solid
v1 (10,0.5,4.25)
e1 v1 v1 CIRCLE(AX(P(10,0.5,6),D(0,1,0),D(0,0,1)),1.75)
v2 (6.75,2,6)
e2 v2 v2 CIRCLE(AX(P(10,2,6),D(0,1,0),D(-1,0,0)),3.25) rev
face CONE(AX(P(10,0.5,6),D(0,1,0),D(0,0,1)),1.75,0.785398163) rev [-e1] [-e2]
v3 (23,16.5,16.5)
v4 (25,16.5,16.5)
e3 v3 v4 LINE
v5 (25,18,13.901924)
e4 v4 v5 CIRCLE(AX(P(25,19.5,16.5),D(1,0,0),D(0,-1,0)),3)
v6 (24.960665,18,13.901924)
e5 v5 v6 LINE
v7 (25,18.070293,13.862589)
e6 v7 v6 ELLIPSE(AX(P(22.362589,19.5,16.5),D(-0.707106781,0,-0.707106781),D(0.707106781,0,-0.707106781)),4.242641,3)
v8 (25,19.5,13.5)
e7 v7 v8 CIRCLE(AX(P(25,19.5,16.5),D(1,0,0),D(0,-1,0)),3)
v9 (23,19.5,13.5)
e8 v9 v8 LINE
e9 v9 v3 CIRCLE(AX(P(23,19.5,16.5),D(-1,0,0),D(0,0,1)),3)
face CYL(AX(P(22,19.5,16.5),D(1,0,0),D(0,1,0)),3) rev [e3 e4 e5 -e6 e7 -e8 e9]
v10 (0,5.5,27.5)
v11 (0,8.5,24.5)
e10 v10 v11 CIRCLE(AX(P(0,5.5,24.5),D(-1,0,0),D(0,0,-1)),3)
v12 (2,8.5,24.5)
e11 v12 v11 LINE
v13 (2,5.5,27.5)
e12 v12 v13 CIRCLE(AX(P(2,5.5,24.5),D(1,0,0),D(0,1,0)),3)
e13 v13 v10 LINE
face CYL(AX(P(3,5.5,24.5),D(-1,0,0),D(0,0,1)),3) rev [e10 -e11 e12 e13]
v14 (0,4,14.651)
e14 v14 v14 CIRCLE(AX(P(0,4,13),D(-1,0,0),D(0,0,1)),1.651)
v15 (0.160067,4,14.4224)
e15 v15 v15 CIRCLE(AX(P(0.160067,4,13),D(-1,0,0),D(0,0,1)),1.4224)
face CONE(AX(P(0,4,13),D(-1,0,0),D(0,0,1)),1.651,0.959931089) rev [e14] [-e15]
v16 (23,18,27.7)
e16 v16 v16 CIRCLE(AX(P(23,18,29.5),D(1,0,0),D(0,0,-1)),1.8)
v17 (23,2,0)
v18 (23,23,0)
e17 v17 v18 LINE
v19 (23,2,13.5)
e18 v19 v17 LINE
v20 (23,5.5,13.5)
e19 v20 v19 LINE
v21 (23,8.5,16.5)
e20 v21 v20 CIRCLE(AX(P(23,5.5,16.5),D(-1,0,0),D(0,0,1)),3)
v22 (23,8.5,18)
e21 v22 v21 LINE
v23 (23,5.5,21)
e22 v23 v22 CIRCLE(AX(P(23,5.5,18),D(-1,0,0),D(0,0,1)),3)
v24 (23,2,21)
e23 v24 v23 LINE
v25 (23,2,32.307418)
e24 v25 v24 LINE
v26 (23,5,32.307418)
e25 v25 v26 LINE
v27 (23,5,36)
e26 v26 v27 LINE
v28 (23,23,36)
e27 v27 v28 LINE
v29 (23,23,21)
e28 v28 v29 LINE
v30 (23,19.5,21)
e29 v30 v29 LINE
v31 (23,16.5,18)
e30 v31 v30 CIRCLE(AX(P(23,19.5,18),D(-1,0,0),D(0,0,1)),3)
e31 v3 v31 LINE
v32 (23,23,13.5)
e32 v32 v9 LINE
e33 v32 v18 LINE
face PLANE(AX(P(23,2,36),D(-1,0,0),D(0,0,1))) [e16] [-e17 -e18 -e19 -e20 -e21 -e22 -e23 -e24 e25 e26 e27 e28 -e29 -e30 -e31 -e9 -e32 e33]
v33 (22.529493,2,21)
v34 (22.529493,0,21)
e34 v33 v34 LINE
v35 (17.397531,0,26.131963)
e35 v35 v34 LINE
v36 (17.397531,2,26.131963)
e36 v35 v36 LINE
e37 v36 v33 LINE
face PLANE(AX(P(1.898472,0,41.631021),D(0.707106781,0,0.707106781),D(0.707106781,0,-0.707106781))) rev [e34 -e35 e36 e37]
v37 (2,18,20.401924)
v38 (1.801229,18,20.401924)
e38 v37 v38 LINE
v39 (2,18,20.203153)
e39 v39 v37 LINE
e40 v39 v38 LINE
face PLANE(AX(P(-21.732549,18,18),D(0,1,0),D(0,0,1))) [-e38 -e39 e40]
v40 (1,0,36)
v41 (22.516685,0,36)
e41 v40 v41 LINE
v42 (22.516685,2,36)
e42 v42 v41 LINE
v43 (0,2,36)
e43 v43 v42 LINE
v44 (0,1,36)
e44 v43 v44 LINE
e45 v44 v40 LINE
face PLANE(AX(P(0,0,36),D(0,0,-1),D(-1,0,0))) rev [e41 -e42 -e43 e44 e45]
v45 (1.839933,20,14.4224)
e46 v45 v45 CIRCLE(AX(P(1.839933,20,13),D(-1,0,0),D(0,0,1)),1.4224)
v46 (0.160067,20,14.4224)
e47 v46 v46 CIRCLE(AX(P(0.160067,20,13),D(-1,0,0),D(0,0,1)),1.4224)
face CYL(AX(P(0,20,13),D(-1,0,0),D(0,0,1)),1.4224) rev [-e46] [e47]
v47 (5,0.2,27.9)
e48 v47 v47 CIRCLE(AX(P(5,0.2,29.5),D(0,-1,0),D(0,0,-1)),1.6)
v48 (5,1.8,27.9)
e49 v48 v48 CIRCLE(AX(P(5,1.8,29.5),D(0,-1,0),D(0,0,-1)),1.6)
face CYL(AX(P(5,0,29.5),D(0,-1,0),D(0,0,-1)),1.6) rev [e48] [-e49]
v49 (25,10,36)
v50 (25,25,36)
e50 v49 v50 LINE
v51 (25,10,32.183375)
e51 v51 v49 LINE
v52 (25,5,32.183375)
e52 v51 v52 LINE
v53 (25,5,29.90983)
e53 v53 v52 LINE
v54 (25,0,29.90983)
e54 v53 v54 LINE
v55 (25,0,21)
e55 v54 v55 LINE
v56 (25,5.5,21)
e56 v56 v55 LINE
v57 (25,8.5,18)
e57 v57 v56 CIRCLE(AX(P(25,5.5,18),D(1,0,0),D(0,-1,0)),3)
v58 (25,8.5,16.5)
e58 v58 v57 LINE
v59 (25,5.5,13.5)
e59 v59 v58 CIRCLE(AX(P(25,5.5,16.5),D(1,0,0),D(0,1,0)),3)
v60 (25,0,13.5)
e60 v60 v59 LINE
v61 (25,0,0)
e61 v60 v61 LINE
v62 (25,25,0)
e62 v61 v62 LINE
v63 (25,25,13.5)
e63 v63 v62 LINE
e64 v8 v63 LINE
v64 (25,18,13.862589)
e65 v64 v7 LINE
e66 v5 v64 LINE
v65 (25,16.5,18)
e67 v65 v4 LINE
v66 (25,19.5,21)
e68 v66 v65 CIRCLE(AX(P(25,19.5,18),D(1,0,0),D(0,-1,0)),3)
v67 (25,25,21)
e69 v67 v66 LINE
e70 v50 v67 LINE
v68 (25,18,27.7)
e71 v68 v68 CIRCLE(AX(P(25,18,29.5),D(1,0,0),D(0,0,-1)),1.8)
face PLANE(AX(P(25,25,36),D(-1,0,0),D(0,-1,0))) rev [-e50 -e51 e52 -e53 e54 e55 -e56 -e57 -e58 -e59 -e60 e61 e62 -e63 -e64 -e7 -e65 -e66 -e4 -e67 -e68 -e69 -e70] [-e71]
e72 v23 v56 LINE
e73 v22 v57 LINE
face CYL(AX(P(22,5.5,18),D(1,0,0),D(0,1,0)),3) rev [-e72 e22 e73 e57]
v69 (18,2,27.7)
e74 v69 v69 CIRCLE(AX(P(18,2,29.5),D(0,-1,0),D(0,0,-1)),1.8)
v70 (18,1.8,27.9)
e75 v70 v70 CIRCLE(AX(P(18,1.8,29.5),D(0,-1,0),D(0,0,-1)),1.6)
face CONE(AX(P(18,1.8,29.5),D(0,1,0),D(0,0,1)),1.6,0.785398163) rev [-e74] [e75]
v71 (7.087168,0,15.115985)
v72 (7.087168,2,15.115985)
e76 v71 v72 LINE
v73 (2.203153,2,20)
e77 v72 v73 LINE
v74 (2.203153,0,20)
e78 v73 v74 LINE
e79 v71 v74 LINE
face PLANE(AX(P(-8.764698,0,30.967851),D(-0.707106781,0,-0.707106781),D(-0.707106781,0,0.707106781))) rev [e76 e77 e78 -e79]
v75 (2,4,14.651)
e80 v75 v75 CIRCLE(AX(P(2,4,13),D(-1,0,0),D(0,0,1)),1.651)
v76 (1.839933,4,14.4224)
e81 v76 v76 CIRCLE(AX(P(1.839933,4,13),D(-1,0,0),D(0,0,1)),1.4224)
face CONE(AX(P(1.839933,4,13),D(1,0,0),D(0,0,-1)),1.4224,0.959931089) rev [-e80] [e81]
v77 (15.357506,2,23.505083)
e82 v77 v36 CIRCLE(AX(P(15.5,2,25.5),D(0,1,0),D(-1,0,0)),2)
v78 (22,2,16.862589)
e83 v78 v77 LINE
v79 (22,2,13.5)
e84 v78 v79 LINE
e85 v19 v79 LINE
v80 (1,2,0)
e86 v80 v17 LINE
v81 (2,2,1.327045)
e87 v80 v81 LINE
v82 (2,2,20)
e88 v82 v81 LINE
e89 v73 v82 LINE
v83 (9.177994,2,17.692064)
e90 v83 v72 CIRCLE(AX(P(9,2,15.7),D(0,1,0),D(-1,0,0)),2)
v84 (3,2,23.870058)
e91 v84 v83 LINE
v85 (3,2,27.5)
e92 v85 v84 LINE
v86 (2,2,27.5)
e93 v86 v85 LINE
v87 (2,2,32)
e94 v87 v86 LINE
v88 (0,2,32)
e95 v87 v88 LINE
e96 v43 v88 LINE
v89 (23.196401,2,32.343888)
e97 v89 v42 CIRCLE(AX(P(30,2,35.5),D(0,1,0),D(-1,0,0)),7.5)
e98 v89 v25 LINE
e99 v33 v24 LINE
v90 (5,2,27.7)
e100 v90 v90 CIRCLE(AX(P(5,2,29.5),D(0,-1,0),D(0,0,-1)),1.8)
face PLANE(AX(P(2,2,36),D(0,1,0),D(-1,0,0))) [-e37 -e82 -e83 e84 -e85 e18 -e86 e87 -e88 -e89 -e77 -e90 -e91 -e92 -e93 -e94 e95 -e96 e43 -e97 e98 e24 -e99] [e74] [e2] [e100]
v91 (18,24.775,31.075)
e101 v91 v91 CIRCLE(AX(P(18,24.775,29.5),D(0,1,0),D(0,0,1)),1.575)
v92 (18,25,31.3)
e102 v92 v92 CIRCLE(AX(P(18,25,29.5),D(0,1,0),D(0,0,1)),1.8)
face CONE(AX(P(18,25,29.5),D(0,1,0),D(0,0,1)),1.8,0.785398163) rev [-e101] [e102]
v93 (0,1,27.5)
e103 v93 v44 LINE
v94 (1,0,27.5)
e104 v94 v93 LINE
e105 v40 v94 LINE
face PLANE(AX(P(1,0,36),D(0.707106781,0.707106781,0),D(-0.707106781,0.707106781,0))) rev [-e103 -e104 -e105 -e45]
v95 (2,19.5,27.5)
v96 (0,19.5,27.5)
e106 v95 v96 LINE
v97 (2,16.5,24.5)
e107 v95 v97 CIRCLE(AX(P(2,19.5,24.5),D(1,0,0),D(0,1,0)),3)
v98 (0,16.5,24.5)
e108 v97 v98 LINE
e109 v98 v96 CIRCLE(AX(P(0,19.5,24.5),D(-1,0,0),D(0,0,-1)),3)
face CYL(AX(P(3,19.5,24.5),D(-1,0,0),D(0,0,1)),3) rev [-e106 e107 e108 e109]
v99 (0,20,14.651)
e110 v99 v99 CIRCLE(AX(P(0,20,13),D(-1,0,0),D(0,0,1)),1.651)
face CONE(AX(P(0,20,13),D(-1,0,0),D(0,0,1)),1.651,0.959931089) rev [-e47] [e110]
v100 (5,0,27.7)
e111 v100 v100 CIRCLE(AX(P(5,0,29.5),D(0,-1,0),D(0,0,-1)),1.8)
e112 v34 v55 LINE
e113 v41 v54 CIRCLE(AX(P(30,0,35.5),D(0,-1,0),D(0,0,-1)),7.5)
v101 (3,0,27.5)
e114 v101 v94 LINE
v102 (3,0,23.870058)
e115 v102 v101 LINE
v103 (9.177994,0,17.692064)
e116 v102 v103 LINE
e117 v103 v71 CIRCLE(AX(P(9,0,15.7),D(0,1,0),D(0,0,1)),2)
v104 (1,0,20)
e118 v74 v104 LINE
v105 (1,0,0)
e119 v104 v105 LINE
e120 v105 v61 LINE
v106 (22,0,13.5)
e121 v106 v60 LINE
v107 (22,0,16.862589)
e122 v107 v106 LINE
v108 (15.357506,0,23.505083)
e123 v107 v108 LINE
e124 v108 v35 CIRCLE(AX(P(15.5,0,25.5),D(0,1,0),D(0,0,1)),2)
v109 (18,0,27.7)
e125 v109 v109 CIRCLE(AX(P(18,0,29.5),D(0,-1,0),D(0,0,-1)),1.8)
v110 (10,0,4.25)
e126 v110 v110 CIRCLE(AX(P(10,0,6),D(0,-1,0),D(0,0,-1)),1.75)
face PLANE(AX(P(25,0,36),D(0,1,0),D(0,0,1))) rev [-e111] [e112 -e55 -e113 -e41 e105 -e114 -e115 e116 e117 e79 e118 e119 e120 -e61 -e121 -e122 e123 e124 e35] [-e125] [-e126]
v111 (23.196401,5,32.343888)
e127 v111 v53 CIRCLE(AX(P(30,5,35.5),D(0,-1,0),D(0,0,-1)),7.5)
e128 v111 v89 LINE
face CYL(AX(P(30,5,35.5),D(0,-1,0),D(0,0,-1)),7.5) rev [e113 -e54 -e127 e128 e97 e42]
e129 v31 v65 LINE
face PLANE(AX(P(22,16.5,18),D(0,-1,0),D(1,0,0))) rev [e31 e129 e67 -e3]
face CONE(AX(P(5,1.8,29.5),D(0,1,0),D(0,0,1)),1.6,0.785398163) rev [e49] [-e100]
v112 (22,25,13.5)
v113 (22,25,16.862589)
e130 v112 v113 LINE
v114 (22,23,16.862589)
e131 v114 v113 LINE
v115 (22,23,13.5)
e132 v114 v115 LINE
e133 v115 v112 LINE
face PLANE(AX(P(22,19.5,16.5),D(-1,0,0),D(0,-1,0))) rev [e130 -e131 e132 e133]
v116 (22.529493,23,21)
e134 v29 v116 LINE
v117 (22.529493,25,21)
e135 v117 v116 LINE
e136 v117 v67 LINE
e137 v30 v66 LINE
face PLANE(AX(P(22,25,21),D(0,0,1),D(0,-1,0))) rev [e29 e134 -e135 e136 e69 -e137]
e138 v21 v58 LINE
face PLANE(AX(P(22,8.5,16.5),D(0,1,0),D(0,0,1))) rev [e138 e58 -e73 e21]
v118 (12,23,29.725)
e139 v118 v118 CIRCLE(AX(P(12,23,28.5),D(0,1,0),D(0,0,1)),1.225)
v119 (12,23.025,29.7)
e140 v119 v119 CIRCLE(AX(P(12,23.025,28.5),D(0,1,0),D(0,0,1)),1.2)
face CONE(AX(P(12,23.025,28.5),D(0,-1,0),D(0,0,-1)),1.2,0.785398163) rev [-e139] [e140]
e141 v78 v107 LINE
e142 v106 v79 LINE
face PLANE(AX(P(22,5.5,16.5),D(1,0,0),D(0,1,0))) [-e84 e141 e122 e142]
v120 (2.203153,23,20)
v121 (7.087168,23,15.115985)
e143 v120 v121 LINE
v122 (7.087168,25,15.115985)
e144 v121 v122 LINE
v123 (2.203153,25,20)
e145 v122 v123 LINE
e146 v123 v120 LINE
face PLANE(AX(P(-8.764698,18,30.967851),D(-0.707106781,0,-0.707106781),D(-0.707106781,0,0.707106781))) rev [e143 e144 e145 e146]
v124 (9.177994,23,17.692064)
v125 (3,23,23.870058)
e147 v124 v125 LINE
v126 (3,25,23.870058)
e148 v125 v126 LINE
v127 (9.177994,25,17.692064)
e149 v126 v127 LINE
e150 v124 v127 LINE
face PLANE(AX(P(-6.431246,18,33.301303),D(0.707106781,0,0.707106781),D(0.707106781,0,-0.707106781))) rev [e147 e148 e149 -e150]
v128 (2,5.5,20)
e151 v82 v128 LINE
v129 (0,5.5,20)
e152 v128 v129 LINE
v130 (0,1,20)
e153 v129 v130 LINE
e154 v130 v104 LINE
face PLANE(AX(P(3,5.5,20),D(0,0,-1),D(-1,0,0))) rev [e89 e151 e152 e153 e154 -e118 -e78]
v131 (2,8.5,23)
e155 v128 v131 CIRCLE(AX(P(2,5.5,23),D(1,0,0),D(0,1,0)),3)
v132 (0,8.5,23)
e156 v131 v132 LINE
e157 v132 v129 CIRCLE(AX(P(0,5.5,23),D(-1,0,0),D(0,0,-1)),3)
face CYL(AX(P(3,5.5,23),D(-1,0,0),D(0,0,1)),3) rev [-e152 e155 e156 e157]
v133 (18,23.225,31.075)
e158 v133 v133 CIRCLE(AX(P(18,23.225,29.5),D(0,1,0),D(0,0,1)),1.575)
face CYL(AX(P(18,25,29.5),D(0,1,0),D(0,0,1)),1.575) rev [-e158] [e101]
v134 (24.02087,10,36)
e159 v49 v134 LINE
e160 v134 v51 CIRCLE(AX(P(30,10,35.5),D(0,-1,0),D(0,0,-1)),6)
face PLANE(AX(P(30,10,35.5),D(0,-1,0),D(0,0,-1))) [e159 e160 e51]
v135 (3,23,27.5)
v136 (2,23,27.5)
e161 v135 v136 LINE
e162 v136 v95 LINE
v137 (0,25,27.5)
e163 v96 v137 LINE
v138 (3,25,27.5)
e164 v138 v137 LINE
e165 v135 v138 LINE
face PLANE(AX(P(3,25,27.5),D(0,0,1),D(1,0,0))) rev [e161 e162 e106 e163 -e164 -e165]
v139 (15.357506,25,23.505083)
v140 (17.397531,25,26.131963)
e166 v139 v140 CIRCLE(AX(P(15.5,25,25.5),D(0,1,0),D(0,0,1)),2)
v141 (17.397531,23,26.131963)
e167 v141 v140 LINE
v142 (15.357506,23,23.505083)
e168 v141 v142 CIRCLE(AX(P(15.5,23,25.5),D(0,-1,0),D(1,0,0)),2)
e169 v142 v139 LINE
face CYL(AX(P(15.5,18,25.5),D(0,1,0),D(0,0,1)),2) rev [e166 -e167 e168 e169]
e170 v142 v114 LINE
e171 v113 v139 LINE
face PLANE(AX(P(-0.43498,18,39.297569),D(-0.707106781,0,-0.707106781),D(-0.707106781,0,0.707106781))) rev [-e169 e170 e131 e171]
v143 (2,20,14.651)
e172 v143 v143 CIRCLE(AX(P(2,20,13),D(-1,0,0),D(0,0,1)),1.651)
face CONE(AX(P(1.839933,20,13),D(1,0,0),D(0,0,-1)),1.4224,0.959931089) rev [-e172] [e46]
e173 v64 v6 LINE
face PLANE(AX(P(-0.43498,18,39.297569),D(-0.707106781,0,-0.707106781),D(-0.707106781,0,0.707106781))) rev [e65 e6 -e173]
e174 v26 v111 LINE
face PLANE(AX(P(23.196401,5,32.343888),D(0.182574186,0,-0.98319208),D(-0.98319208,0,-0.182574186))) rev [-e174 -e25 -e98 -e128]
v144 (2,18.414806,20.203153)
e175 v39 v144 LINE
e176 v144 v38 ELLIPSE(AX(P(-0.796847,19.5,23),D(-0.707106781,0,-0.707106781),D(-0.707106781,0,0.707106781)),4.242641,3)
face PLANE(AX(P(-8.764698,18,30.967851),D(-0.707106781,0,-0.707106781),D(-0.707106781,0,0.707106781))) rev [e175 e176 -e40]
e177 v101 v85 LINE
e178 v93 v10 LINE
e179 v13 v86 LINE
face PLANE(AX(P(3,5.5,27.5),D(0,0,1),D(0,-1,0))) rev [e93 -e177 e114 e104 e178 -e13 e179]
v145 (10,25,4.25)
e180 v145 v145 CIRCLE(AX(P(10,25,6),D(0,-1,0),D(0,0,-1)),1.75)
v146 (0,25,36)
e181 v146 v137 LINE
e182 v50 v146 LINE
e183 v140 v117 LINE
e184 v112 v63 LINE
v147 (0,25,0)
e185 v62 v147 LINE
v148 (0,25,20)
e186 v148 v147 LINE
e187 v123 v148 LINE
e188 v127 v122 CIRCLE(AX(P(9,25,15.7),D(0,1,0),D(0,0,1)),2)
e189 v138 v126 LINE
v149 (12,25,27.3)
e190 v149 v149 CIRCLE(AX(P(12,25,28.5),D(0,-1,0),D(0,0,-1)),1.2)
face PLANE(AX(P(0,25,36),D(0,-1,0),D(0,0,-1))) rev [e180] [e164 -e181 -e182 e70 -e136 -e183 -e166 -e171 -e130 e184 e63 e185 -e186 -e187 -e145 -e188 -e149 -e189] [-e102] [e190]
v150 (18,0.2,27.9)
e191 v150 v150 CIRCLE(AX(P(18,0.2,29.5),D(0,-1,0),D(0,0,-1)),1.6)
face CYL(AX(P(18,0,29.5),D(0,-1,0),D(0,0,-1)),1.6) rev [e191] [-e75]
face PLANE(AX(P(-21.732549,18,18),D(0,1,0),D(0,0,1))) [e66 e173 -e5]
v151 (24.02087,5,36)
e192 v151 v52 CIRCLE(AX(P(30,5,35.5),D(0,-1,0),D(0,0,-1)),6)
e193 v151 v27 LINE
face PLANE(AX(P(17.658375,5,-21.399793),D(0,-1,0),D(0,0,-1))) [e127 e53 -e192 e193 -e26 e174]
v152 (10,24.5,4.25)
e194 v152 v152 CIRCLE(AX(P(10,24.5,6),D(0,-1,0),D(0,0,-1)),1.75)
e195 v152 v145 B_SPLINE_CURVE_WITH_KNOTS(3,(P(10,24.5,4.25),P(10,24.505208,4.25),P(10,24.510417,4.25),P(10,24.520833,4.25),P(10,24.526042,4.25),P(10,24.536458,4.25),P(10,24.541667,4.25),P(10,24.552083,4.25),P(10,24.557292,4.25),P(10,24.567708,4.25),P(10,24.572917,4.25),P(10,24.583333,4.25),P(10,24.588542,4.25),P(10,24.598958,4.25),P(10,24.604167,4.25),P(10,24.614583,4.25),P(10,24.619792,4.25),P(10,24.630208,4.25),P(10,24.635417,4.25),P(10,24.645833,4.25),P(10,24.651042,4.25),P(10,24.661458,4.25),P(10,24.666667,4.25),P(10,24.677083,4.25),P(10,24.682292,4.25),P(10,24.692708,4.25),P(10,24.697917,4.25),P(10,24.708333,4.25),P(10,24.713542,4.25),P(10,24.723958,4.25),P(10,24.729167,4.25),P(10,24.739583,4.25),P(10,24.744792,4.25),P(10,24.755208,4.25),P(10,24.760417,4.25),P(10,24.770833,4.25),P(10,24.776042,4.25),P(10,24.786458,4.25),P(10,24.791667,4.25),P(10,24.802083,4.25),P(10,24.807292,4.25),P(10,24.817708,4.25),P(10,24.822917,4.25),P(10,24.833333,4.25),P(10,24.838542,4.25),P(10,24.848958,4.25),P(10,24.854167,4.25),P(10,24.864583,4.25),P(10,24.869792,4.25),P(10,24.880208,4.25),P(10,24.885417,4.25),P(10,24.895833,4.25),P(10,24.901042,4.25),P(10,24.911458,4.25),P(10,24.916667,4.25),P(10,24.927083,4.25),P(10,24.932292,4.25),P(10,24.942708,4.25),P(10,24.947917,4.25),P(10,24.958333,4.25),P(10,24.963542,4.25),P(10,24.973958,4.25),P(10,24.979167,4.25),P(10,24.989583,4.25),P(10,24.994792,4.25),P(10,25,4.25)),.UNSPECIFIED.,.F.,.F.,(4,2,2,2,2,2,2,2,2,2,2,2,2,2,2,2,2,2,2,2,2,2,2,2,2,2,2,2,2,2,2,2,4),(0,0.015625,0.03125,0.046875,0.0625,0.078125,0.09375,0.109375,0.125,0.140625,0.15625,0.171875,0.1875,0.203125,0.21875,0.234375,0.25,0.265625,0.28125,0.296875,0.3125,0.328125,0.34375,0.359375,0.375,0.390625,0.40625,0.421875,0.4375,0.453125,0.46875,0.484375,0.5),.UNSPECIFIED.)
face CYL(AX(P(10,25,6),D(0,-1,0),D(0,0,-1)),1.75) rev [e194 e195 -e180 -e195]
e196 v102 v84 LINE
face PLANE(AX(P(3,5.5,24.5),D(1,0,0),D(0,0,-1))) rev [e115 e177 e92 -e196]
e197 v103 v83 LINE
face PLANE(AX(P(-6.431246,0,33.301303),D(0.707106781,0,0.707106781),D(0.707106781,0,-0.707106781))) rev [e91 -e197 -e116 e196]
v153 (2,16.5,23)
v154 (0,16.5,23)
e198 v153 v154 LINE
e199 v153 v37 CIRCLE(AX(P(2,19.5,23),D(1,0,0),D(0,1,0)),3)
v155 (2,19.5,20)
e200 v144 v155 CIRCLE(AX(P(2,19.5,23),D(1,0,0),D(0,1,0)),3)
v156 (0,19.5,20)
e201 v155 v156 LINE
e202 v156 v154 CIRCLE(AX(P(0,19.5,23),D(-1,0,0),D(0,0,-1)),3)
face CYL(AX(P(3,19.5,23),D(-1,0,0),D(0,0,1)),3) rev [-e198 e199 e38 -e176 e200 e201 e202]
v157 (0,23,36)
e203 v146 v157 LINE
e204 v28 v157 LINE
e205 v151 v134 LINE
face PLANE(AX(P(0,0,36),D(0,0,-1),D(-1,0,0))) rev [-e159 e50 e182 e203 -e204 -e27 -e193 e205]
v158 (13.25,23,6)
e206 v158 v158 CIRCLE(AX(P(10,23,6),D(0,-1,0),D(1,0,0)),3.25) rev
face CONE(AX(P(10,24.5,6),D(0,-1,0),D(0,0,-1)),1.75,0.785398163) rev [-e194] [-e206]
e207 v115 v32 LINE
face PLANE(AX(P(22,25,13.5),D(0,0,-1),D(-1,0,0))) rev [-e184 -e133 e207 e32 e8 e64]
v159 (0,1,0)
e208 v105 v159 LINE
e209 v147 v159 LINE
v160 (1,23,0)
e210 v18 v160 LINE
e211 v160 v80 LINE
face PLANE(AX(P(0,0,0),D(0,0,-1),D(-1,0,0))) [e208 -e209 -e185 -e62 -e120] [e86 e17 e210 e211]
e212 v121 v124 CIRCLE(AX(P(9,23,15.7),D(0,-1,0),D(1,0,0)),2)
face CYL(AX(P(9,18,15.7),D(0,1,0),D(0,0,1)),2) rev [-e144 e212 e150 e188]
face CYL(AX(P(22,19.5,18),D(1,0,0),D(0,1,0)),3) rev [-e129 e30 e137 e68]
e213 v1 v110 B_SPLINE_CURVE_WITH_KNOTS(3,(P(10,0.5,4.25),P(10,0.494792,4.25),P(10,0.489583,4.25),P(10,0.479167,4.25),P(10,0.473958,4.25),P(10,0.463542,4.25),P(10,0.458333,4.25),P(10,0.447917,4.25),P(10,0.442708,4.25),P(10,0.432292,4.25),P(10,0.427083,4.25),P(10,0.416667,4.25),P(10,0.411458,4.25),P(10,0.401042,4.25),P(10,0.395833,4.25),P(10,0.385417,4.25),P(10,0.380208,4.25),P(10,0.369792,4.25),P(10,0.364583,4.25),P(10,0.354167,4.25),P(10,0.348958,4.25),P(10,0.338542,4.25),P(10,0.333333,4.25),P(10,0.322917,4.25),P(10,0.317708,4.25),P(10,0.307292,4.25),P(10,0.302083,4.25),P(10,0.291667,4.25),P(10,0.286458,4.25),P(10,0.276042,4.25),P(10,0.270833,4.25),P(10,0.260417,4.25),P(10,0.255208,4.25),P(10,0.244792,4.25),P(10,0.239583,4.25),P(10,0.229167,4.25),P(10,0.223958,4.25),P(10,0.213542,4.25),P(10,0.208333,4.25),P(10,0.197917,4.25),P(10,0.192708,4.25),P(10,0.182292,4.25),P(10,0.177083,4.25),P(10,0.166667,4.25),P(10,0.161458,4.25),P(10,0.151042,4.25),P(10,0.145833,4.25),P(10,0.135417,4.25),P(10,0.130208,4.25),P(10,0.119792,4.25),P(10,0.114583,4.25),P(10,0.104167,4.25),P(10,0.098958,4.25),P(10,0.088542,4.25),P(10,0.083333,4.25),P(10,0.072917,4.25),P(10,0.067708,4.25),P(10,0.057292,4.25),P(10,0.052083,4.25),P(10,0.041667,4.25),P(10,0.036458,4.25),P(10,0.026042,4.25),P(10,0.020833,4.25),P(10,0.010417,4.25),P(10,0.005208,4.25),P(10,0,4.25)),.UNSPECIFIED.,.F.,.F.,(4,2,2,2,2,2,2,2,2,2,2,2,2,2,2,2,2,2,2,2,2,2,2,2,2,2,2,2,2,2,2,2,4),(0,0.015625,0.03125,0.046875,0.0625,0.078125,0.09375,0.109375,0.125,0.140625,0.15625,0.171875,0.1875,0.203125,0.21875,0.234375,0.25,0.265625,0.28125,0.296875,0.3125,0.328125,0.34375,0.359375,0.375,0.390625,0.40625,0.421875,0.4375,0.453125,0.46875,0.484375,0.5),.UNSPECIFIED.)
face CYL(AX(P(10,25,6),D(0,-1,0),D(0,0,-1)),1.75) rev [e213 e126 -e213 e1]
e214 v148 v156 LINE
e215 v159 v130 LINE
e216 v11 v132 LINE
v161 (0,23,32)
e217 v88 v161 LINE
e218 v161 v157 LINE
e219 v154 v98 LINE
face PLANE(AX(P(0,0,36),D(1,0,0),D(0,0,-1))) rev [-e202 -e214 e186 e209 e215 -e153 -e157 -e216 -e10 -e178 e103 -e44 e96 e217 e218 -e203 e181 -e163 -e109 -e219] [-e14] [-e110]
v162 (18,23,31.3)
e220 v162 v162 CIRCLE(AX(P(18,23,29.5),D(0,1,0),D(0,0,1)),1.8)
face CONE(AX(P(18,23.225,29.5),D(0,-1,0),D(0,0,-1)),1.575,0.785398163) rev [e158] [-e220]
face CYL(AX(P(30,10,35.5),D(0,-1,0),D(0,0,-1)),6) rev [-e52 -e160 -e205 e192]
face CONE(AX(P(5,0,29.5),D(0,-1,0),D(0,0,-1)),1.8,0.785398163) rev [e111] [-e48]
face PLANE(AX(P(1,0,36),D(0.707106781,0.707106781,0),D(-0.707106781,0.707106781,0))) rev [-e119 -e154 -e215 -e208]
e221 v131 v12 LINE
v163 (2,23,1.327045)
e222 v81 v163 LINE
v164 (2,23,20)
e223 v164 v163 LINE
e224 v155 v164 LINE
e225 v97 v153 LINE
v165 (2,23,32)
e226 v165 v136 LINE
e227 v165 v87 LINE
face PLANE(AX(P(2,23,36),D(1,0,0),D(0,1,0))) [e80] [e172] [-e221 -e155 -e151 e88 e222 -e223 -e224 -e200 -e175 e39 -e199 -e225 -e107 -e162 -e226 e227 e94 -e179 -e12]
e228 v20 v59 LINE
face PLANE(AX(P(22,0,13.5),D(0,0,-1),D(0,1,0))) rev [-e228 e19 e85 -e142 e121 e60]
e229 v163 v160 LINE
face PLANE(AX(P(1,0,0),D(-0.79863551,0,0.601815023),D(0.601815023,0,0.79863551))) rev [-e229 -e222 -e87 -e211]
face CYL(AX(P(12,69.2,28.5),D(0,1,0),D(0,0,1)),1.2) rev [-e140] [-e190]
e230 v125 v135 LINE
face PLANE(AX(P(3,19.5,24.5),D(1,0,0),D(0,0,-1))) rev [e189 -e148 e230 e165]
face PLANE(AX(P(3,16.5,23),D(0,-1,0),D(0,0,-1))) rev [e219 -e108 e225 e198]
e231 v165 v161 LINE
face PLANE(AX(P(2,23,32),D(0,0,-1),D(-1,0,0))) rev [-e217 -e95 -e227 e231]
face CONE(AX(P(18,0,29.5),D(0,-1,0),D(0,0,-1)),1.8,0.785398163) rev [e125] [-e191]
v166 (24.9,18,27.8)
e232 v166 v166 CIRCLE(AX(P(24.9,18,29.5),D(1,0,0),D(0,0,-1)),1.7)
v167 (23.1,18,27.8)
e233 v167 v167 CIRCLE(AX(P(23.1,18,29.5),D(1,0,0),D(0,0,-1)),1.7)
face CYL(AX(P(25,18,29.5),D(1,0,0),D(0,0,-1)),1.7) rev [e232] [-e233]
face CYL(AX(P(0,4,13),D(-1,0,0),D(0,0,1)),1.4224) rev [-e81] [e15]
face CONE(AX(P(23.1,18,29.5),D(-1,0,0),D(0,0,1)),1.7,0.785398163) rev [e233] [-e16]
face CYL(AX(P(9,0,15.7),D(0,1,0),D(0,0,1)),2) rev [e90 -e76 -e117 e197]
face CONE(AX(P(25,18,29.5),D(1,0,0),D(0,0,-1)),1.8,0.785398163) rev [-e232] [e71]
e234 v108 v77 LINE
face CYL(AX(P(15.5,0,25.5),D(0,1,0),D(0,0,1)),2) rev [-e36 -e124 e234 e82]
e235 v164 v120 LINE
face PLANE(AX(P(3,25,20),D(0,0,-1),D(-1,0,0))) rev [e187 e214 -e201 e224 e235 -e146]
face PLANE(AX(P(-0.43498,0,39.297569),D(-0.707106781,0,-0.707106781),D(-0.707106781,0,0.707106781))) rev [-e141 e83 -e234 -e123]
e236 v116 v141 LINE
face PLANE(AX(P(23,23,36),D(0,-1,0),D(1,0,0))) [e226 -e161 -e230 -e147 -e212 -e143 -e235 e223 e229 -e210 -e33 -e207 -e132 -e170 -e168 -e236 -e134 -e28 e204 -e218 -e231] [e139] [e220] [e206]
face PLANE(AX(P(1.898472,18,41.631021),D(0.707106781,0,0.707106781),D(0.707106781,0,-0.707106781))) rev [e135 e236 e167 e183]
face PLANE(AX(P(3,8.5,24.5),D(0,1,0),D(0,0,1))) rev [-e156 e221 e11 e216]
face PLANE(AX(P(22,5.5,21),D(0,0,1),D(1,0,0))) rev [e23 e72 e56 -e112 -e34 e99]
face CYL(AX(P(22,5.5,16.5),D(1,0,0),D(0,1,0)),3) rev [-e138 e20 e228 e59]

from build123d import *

# Parameters (mm, degrees)
SKETCH_1_W                   = 25
SKETCH_1_H                   = 25
SKETCH_1_W_2                 = 21
SKETCH_1_H_2                 = 21
EXTRUDE_1_DEPTH              = 36
SKETCH_11_R                  = 2
CUT_EXTRUDE_3_DEPTH          = 7
CUT_EXTRUDE_START            = -19
SKETCH_11_3_R                = 2
CUT_EXTRUDE_11_DEPTH         = 32.457903246
CHAMFER_2_SIZE               = 1
CHAMFER_4_SIZE               = 1
CHAMFER_4_SIZE2              = 1.327044822
SKETCH_14_R                  = 7.5
CUT_EXTRUDE_6_DEPTH          = 5
CHAMFER_5_SIZE               = 0.5
CUT_EXTRUDE_8_DEPTH          = 50.497474683
HOLE_WIZARD_3_2_AT_2_COUNT   = 2
HOLE_WIZARD_3_2_AT_2_PITCH   = 13
HOLE_WIZARD_4_401_AT_2_COUNT = 2
HOLE_WIZARD_4_401_AT_2_PITCH = 16
CUT_EXTRUDE_13_DEPTH         = 3
CUT_EXTRUDE_14_DEPTH         = 3
SKETCH_25_R                  = 1.75
CUT_EXTRUDE_15_DEPTH         = 51.457903246
SKETCH_26_R                  = 6
CUT_EXTRUDE_16_DEPTH         = 5
CHAMFER_6_SIZE               = 1.5


with BuildPart() as part:
    # Sketch 1 → Extrude 1 (new body)
    with BuildSketch(Plane.XY):
        with Locations((12.5, 12.5)):
            Rectangle(SKETCH_1_W, SKETCH_1_H)
        with Locations((12.5, 12.5)):
            Rectangle(SKETCH_1_W_2, SKETCH_1_H_2, mode=Mode.SUBTRACT)
    extrude(amount=EXTRUDE_1_DEPTH)

    # Sketch 11 → Cut-Extrude 3 (cut)
    with BuildSketch(Plane(origin=(0, 25, 0), x_dir=(1, 0, 0), z_dir=(0, 1, 0))):
        with BuildLine():
            Line((25, -18.52949345), (25, -13.862588694))
            Line((25, -13.862588694), (15.357506109, -23.505082585))
            ThreePointArc((15.357506109, -23.505082585), (16.862903558, -24.03627397), (17.5, -25.5))
            ThreePointArc((17.5, -25.5), (17.47421651, -25.820108062), (17.397530829, -26.131962621))
            Line((17.397530829, -26.131962621), (25, -18.52949345))
        make_face()
        with BuildLine():
            Line((7.087167948, -15.115984981), (0, -22.203152929))
            Line((0, -22.203152929), (0, -26.870057685))
            Line((0, -26.870057685), (9.177993887, -17.692063798))
            ThreePointArc((9.177993887, -17.692063798), (7.447111922, -16.960372412), (7.087167948, -15.115984981))
        make_face()
        with Locations((9, -15.7)):
            Circle(SKETCH_11_R)
        with Locations((15.5, -25.5)):
            Circle(SKETCH_11_R)
    extrude(amount=-CUT_EXTRUDE_3_DEPTH, mode=Mode.SUBTRACT)

    # Sketch 11_3 → Cut-Extrude 11 (cut, through all)
    with BuildSketch(Plane(origin=(0, 25, 0), x_dir=(1, 0, 0), z_dir=(0, 1, 0)).offset(CUT_EXTRUDE_START)):
        with BuildLine():
            Line((25, -18.52949345), (25, -13.862588694))
            Line((25, -13.862588694), (15.357506109, -23.505082585))
            ThreePointArc((15.357506109, -23.505082585), (16.862903558, -24.03627397), (17.5, -25.5))
            ThreePointArc((17.5, -25.5), (17.47421651, -25.820108062), (17.397530829, -26.131962621))
            Line((17.397530829, -26.131962621), (25, -18.52949345))
        make_face()
        with Locations((15.5, -25.5)):
            Circle(SKETCH_11_3_R)
        with Locations((9, -15.7)):
            Circle(SKETCH_11_3_R)
        with BuildLine():
            Line((0, -22.203152929), (0, -26.870057685))
            Line((0, -26.870057685), (9.177993887, -17.692063798))
            ThreePointArc((9.177993887, -17.692063798), (7.447111922, -16.960372412), (7.087167948, -15.115984981))
            Line((7.087167948, -15.115984981), (0, -22.203152929))
        make_face()
    extrude(amount=-CUT_EXTRUDE_11_DEPTH, mode=Mode.SUBTRACT)

    # Hole Wizard M21: read off the stored shape, not the designer's step
    # Hole Wizard M21 outline → Hole Wizard M21 (revolve, cut)
    with BuildSketch(Plane(origin=(12, 0, 28.5), x_dir=(1, 0, 0), z_dir=(0, 0, 1))):
        Polygon((0, 23), (1.225, 23), (1.2, 23.025), (1.2, 25), (0, 25), align=None)
    revolve(axis=Axis((12, 0, 28.5), (0, 1, 0)), mode=Mode.SUBTRACT)

    # Chamfer 2
    chamfer_2_edges = [part.edges().sort_by_distance(p)[0] for p in [
        (0, 0, 31.435028843),
        (0, 0, 11.101576465),
    ]]
    chamfer(chamfer_2_edges, length=CHAMFER_2_SIZE)

    # Chamfer 4
    chamfer_4_edges = [part.edges().sort_by_distance(p)[0] for p in [
        (2, 12.5, 0),
    ]]
    chamfer_4_side = [part.faces().sort_by_distance(p)[0] for p in [
        (0.353553391, 13, 0),
    ]]
    chamfer(chamfer_4_edges, length=CHAMFER_4_SIZE, length2=CHAMFER_4_SIZE2, reference=chamfer_4_side[0])

    # Sketch 14 → Cut-Extrude 6 (cut)
    with BuildSketch(Plane.XZ):
        with Locations((30, 35.5)):
            Circle(SKETCH_14_R)
    extrude(amount=-CUT_EXTRUDE_6_DEPTH, mode=Mode.SUBTRACT)

    # Chamfer 5
    # the kernel refuses this chamfer: 0.5 mm, written as the material it takes off along each edge
    with BuildSketch(Plane(origin=(23, 5, 32.807417596), x_dir=(0, 0, -1), z_dir=(0, -1, 0))) as chamfer_5_piece_1:
        with BuildLine():
            Line((CHAMFER_5_SIZE, 0), (0.463529248, 0.196401008))
            ThreePointArc((0.463529248, 0.196401008), (0.235400494, 0.095152706), (0, 0))
            Line((0, 0), (CHAMFER_5_SIZE, 0))
        make_face()
    extrude(amount=3, mode=Mode.SUBTRACT)

    # Sketch 20 → Cut-Extrude 8 (cut, through all)
    with BuildSketch(Plane(origin=(2, 0, 0), x_dir=(0, 0, -1), z_dir=(1, 0, 0))):
        Polygon((-131.440037453, 23), (-36, 23), (-32, 23), (-32, 2), (-36, 2), (-131.440037453, 2), (-322.32011236, 2), (-322.32011236, 23), align=None)
    extrude(amount=-CUT_EXTRUDE_8_DEPTH, mode=Mode.SUBTRACT)

    # Sketch 15 → Hole Wizard 3.2 (revolve, cut)
    with BuildSketch(Plane(origin=(5, 0, 29.5), x_dir=(0, 0, -1), z_dir=(1, 0, 0))):
        Polygon((0, 0), (0, 2), (1.8, 2), (1.6, 1.8), (1.6, 0.2), (1.8, 0), align=None)
    hole_wizard_3_2 = revolve(axis=Axis((5, -6.35, 29.5), (0, 1, 0)), mode=Mode.SUBTRACT)

    # Hole Wizard 3.2 at 2: Hole Wizard 3.2 ×2
    with Locations(*[(i * HOLE_WIZARD_3_2_AT_2_PITCH, 0, 0) for i in range(1, HOLE_WIZARD_3_2_AT_2_COUNT)]):
        add(hole_wizard_3_2, mode=Mode.SUBTRACT)

    # Sketch 17 → Hole Wizard 4-401 (revolve, cut)
    with BuildSketch(Plane(origin=(0, 20, 13), x_dir=(0, 0, 1), z_dir=(0, 1, 0))):
        Polygon((0, 0), (0, 2), (1.651, 2), (1.4224, 1.839932557), (1.4224, 0.160067443), (1.651, 0), align=None)
    hole_wizard_4_401 = revolve(axis=Axis((-6.35, 20, 13), (1, 0, 0)), mode=Mode.SUBTRACT)

    # Hole Wizard 4-401 at 2: Hole Wizard 4-401 ×2
    with Locations(*[(0, -i * HOLE_WIZARD_4_401_AT_2_PITCH, 0) for i in range(1, HOLE_WIZARD_4_401_AT_2_COUNT)]):
        add(hole_wizard_4_401, mode=Mode.SUBTRACT)

    # Sketch 23 → Cut-Extrude 13 (cut)
    with BuildSketch(Plane.ZY):
        with BuildLine():
            Line((20, 25), (20, 19.5))
            ThreePointArc((20, 19.5), (20.878679656, 17.378679656), (23, 16.5))
            Line((23, 16.5), (24.5, 16.5))
            ThreePointArc((24.5, 16.5), (26.621320344, 17.378679656), (27.5, 19.5))
            Line((27.5, 19.5), (27.5, 25))
            Line((27.5, 25), (20, 25))
        make_face()
        with BuildLine():
            Line((20, 5.5), (20, 0))
            Line((20, 0), (27.5, 0))
            Line((27.5, 0), (27.5, 5.5))
            ThreePointArc((27.5, 5.5), (26.621320344, 7.621320344), (24.5, 8.5))
            Line((24.5, 8.5), (23, 8.5))
            ThreePointArc((23, 8.5), (20.878679656, 7.621320344), (20, 5.5))
        make_face()
    extrude(amount=-CUT_EXTRUDE_13_DEPTH, mode=Mode.SUBTRACT)

    # Sketch 24 → Cut-Extrude 14 (cut)
    with BuildSketch(Plane(origin=(25, 0, 0), x_dir=(0, 0, -1), z_dir=(1, 0, 0))):
        with BuildLine():
            Line((-13.5, 25), (-13.5, 19.5))
            ThreePointArc((-13.5, 19.5), (-14.378679656, 17.378679656), (-16.5, 16.5))
            Line((-16.5, 16.5), (-18, 16.5))
            ThreePointArc((-18, 16.5), (-20.121320344, 17.378679656), (-21, 19.5))
            Line((-21, 19.5), (-21, 25))
            Line((-21, 25), (-13.5, 25))
        make_face()
        with BuildLine():
            Line((-13.5, 0), (-13.5, 5.5))
            ThreePointArc((-13.5, 5.5), (-14.378679656, 7.621320344), (-16.5, 8.5))
            Line((-16.5, 8.5), (-18, 8.5))
            ThreePointArc((-18, 8.5), (-20.121320344, 7.621320344), (-21, 5.5))
            Line((-21, 5.5), (-21, 0))
            Line((-21, 0), (-13.5, 0))
        make_face()
    extrude(amount=-CUT_EXTRUDE_14_DEPTH, mode=Mode.SUBTRACT)

    # Sketch 25 → Cut-Extrude 15 (cut, through all)
    with BuildSketch(Plane.XZ):
        with Locations(Location((10, 6, 0), (0, 0, 270))):
            Circle(SKETCH_25_R)
    extrude(amount=-CUT_EXTRUDE_15_DEPTH, mode=Mode.SUBTRACT)

    # Sketch 26 → Cut-Extrude 16 (cut)
    with BuildSketch(Plane.XZ.offset(-5)):
        with Locations((30, 35.5)):
            Circle(SKETCH_26_R)
    extrude(amount=-CUT_EXTRUDE_16_DEPTH, mode=Mode.SUBTRACT)

    # Sketch 27 → Hole Wizard M31 (revolve, cut)
    with BuildSketch(Plane(origin=(18, 25, 29.5), x_dir=(0, 0, 1), z_dir=(1, 0, 0))):
        Polygon((0, 0), (0, 2), (1.8, 2), (1.575, 1.775), (1.575, 0.225), (1.8, 0), align=None)
    revolve(axis=Axis((18, 31.35, 29.5), (0, -1, 0)), mode=Mode.SUBTRACT)

    # Chamfer 6
    chamfer_6_edges = [part.edges().sort_by_distance(p)[0] for p in [
        (10, 2, 7.75),
        (10, 23, 7.75),
    ]]
    chamfer(chamfer_6_edges, length=CHAMFER_6_SIZE)

    # Sketch 29 → Hole Wizard M32 (revolve, cut)
    with BuildSketch(Plane(origin=(25, 18, 29.5), x_dir=(0, 0, -1), z_dir=(0, 1, 0))):
        Polygon((0, 0), (0, 2), (1.8, 2), (1.7, 1.9), (1.7, 0.1), (1.8, 0), align=None)
    revolve(axis=Axis((31.35, 18, 29.5), (-1, 0, 0)), mode=Mode.SUBTRACT)


solid = part.part
